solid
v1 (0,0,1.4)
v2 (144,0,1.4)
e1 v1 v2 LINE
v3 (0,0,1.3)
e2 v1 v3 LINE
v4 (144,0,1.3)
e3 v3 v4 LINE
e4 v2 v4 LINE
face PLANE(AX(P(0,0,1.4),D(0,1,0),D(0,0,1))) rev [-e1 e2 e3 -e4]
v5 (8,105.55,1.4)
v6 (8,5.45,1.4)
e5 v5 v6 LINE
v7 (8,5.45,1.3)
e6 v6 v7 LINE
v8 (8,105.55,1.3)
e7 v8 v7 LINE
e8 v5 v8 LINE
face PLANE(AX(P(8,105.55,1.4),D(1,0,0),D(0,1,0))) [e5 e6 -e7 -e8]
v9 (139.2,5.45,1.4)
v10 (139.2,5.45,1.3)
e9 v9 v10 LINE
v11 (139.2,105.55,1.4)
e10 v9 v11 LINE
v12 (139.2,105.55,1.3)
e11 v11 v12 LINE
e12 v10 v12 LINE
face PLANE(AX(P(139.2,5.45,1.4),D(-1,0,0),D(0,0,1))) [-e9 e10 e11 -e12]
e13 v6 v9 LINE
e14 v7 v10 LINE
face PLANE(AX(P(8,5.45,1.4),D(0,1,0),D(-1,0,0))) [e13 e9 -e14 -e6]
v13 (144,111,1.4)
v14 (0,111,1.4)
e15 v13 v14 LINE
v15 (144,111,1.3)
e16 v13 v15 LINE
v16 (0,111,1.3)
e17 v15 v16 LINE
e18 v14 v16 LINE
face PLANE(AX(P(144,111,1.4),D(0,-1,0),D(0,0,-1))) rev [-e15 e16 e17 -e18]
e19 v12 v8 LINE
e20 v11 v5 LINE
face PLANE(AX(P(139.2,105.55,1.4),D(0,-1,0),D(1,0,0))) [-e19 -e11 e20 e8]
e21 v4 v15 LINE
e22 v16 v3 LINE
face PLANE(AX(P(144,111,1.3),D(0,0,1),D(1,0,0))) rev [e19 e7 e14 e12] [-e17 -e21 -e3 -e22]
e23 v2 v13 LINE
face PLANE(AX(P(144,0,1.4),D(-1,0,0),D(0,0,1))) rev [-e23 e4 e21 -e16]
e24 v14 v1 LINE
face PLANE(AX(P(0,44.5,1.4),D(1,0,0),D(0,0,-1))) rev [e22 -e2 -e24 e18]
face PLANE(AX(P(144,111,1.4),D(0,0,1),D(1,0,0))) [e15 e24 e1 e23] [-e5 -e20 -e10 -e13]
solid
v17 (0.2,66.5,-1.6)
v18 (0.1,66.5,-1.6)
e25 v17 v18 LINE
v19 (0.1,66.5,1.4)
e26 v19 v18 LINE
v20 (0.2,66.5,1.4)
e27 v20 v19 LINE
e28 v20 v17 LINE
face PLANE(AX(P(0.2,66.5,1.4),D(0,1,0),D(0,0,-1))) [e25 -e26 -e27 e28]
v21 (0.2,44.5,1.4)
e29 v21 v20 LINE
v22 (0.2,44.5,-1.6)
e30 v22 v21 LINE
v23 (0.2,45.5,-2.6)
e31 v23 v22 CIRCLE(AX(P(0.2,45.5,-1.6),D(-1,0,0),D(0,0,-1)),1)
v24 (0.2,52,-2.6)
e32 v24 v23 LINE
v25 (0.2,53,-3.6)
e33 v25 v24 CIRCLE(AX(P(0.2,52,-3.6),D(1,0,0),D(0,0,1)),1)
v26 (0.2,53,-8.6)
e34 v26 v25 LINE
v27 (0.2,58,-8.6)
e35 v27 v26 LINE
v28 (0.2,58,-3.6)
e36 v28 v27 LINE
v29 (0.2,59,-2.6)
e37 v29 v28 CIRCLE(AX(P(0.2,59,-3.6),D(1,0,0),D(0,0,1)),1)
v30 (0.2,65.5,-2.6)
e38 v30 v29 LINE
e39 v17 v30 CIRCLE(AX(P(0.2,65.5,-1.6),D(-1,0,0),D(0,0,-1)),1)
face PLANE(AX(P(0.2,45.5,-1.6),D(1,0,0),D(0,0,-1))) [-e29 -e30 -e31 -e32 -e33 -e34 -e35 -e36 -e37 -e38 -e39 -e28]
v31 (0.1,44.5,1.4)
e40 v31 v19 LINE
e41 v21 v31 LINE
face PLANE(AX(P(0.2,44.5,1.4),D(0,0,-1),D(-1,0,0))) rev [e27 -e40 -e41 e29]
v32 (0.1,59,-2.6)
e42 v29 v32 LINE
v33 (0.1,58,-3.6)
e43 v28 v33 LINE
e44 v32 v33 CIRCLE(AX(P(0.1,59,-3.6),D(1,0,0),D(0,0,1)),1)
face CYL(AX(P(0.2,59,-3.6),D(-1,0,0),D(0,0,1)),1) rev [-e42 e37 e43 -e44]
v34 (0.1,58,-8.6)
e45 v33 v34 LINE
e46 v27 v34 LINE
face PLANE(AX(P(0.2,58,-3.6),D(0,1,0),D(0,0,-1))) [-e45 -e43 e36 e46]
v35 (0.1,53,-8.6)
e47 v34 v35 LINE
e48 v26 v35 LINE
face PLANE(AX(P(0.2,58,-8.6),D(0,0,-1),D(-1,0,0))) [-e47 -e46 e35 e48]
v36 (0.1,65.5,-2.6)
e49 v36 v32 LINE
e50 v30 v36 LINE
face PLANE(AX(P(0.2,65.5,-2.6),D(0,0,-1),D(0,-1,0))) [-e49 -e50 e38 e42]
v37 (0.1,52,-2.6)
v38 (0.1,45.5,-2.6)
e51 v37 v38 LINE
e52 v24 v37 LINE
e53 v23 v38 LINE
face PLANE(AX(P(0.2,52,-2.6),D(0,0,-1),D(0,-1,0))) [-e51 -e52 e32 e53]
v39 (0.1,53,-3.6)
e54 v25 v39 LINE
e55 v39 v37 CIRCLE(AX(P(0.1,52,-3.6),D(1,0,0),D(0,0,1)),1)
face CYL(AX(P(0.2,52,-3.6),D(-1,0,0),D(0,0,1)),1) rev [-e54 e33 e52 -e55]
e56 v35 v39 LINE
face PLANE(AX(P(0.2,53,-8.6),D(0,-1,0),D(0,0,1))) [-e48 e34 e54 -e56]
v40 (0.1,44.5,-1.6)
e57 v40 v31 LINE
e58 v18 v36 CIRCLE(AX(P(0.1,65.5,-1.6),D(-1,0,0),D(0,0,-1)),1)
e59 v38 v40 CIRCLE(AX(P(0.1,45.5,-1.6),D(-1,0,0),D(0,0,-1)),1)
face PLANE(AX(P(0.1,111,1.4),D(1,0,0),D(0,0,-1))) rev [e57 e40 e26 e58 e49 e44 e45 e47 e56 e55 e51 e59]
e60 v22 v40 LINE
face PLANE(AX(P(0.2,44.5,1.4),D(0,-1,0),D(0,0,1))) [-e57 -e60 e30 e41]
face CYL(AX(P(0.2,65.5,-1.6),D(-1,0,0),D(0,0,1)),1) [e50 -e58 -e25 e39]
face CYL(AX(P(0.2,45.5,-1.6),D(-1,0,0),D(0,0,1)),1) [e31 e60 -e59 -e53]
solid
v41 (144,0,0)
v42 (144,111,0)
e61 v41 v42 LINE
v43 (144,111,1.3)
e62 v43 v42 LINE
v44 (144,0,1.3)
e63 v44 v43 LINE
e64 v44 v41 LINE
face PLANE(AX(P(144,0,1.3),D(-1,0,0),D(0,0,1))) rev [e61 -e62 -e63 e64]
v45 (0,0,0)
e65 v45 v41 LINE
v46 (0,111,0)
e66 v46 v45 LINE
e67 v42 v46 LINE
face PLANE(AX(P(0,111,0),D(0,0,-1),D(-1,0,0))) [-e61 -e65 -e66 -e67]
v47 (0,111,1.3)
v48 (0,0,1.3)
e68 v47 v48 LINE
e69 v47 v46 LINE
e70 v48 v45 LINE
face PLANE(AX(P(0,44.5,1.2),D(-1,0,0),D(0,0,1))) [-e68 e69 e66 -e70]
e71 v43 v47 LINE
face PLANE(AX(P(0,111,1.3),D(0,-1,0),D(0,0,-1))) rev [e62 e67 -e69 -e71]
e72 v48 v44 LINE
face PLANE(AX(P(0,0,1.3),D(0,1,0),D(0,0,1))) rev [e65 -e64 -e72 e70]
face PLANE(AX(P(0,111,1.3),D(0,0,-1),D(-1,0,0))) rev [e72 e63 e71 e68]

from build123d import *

# Parameters (mm, degrees)
SKETCH1_W             = 144
SKETCH1_H             = 111
BOSS_EXTRUDE1_DEPTH   = 1.3
BOSS_EXTRUDE2_DEPTH   = 0.1
SKETCH5_W             = 131.2
SKETCH5_H             = 100.1
BOSS_EXTRUDE3_DEPTH   = 0.1
BODY_MOVE_COPY1_ANGLE = 90


with BuildPart() as part:
    # Sketch1 → Boss-Extrude1 (new body)
    with BuildSketch(Plane.XY):
        with Locations((72, 55.5)):
            Rectangle(SKETCH1_W, SKETCH1_H)
    extrude(amount=BOSS_EXTRUDE1_DEPTH)

    # Sketch2 → Boss-Extrude2 (add)
    with BuildSketch(Plane.XY.offset(1.3)):
        with BuildLine():
            Line((0, 66.5), (-3, 66.5))
            ThreePointArc((-3, 66.5), (-3.707106781, 66.207106781), (-4, 65.5))
            Line((-4, 65.5), (-4, 59))
            ThreePointArc((-4, 59), (-4.292893219, 58.292893219), (-5, 58))
            Line((-5, 58), (-10, 58))
            Line((-10, 58), (-10, 53))
            Line((-10, 53), (-5, 53))
            ThreePointArc((-5, 53), (-4.292893219, 52.707106781), (-4, 52))
            Line((-4, 52), (-4, 45.5))
            ThreePointArc((-4, 45.5), (-3.707106781, 44.792893219), (-3, 44.5))
            Line((-3, 44.5), (0, 44.5))
            Line((0, 44.5), (0, 66.5))
        make_face()
    extrude(amount=-BOSS_EXTRUDE2_DEPTH)


with BuildPart() as body_2:
    # Sketch5 → Boss-Extrude3 (new body)
    with BuildSketch(Plane.XY.offset(1.3)):
        Polygon((144, 111), (0, 111), (0, 66.5), (0, 44.5), (0, 0), (144, 0), align=None)
        with Locations((73.6, 55.5)):
            Rectangle(SKETCH5_W, SKETCH5_H, mode=Mode.SUBTRACT)
    extrude(amount=BOSS_EXTRUDE3_DEPTH)


with BuildPart() as body_3:
    # Split1: the piece on the far side of the plane
    add(part.part)
    split(bisect_by=Plane(origin=(0, 0, 1.3), x_dir=(0, 0, 1), z_dir=(1, 0, 0)), keep=Keep.BOTTOM)


with BuildPart() as part_1:
    add(part.part)

    # Split1
    split(bisect_by=Plane(origin=(0, 0, 1.3), x_dir=(0, 0, 1), z_dir=(1, 0, 0)), keep=Keep.TOP)


with BuildPart() as body_3_1:
    # Body-Move/Copy1: moved
    add(body_3.part.rotate(Axis((0, 0, 1.4), (0, -1, 0)), BODY_MOVE_COPY1_ANGLE))


solid = Compound([body_2.part, part_1.part, body_3_1.part])
